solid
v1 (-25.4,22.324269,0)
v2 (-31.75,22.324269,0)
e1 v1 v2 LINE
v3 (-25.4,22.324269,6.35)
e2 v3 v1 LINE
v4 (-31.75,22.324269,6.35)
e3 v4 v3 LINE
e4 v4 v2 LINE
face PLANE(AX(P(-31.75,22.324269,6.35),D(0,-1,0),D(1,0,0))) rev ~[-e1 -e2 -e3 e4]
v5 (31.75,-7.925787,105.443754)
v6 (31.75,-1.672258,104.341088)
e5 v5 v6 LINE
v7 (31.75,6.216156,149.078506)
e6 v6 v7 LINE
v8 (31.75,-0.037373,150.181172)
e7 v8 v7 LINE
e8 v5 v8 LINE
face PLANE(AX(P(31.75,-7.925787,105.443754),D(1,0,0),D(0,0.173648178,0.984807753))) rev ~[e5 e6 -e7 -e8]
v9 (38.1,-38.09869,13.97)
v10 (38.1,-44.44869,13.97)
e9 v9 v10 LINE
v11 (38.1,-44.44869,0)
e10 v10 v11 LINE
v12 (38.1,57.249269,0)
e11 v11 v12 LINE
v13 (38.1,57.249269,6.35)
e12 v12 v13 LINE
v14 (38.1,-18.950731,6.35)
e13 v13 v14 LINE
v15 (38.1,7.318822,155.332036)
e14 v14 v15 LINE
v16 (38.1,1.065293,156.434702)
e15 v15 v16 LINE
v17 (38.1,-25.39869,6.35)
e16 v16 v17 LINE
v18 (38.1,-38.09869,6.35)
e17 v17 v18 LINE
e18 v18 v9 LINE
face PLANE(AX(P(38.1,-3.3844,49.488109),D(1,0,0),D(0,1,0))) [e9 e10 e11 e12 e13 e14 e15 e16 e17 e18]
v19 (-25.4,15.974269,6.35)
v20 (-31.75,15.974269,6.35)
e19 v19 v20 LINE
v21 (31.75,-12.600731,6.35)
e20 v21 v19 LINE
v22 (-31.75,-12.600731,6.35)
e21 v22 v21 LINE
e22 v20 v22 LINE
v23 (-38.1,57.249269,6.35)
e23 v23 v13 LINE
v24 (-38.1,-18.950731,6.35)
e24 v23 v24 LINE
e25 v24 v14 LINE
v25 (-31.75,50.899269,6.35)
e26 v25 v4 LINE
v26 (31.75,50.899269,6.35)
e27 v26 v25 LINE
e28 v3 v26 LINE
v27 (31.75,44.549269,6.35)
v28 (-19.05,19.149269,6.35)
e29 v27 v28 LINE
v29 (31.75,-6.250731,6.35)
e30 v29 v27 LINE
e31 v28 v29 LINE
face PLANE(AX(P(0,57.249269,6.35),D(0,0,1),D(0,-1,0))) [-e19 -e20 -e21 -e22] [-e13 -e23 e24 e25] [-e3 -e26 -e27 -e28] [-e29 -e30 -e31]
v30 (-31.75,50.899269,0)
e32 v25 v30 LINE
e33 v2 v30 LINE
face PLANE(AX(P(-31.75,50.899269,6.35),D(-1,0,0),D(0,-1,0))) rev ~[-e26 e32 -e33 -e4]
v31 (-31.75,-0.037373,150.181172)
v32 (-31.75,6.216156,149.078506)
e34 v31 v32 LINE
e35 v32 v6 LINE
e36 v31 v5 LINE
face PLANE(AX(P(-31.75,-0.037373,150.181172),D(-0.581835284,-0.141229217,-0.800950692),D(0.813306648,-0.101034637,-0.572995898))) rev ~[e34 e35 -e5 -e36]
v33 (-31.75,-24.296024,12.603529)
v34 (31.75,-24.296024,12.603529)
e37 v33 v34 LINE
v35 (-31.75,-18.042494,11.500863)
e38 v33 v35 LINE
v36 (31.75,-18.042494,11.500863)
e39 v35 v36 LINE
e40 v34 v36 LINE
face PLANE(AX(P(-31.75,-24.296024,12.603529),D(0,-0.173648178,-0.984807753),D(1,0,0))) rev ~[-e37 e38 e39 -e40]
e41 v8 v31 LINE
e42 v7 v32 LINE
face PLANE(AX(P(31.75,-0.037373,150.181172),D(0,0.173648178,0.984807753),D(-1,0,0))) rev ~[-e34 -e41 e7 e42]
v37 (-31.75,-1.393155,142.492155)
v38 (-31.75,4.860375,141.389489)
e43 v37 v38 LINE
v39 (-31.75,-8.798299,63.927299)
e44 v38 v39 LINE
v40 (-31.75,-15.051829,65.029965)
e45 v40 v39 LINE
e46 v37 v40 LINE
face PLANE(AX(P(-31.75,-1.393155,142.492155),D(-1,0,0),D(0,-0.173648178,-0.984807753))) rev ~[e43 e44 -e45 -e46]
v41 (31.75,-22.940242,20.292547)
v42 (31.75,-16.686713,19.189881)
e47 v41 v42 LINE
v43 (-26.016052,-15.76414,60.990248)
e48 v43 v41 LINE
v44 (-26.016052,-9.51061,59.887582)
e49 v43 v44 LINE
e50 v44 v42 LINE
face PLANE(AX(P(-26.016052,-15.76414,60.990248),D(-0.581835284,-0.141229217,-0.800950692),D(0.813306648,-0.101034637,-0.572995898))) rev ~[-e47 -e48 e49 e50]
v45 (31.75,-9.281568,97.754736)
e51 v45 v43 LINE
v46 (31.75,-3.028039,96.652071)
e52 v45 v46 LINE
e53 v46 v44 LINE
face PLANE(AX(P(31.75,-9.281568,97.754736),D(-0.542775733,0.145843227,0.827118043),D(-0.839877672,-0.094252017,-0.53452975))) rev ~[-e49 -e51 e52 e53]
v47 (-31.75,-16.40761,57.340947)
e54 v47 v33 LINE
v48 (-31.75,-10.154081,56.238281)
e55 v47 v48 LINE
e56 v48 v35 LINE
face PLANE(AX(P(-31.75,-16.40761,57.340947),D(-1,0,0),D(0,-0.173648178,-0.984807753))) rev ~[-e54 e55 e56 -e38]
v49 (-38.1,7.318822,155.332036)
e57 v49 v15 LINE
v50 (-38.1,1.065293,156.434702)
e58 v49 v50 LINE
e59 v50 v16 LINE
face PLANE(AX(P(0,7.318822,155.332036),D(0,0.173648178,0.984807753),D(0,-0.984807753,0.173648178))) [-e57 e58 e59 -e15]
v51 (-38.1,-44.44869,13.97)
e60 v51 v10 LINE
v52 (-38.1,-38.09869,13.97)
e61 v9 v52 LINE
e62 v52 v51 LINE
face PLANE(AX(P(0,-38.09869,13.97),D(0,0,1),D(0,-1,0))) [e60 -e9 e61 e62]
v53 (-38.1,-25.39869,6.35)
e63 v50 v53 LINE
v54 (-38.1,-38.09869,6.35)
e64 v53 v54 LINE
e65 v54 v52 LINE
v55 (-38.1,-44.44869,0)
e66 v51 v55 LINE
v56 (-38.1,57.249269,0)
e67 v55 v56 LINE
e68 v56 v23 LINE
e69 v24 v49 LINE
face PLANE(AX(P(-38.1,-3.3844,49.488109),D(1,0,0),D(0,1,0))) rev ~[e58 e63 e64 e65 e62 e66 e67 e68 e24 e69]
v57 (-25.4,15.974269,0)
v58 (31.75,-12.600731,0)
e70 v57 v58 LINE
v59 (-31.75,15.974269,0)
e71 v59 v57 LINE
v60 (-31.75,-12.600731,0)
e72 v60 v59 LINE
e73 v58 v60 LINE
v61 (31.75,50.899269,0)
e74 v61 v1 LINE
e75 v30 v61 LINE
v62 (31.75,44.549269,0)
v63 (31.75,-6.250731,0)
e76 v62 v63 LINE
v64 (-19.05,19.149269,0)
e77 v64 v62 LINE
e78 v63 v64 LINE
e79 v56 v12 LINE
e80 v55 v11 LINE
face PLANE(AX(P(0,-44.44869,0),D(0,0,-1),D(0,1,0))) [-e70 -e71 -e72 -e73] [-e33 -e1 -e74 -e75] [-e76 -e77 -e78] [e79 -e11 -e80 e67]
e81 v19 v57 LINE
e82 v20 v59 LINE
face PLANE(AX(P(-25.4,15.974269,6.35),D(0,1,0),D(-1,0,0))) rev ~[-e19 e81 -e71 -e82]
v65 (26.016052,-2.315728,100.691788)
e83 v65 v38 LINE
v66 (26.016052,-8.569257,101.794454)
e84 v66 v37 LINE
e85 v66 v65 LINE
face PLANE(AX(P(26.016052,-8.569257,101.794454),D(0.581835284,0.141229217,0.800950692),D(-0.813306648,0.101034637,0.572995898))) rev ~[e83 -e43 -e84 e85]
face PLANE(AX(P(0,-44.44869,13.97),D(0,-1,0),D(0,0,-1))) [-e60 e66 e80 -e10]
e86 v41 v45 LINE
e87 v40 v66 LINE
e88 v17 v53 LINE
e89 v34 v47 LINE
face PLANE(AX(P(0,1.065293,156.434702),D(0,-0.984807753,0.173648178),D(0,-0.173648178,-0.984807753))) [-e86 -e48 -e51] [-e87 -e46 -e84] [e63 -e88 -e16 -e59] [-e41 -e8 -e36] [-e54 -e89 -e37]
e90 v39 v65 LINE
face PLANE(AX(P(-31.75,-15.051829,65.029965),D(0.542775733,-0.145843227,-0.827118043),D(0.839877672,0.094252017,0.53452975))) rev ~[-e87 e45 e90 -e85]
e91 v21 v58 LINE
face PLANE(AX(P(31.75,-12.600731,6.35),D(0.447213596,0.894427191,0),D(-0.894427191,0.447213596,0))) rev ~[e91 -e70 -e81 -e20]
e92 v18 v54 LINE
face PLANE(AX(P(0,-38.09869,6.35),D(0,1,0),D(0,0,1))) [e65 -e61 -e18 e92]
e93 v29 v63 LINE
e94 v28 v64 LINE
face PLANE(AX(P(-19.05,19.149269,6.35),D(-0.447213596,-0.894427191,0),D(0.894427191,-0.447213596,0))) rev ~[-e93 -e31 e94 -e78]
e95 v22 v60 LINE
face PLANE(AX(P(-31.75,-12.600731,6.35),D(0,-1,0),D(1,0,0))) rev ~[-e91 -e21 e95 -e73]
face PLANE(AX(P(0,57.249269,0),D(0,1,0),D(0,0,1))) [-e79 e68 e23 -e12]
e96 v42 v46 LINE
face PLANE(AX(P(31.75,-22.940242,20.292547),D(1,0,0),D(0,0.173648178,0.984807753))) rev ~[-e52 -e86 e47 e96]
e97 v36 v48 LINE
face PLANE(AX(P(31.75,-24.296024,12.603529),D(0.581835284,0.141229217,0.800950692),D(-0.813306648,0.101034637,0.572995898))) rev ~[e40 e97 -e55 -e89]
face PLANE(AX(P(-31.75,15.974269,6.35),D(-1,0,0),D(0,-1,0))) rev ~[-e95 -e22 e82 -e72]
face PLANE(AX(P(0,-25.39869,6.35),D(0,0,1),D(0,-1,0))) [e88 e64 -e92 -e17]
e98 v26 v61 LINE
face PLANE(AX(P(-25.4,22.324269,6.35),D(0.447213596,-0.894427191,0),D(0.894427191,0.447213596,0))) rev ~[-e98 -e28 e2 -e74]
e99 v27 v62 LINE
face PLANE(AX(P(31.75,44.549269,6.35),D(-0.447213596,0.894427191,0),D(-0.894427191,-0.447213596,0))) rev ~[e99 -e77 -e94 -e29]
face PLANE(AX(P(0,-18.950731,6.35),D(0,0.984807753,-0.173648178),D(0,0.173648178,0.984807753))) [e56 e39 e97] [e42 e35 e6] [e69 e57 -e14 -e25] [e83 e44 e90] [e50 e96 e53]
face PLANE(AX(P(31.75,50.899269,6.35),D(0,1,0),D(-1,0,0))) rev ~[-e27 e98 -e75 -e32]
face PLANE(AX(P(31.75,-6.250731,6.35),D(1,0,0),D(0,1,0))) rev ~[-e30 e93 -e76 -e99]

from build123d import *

# Parameters (mm, degrees)
F1_DEPTH = 38.1
F3_DEPTH = 25.4
F5_DEPTH = 6.35


with BuildPart() as f1:
    # F0 (on Right) → F1 (new body, symmetric)
    with BuildSketch(Plane.YZ):
        Polygon((-38.0986895752, 13.97), (-44.4486895752, 13.97), (-44.4486895752, 0), (57.2492694102, 0), (57.2492694102, 6.35), (-18.9507305898, 6.35), (7.3188219328, 155.3320356309), (1.0652927012, 156.4347015591), (-25.3986895752, 6.35), (-38.0986895752, 6.35), align=None)
    extrude(amount=F1_DEPTH, both=True)

    # F2 (on face) → F3 (cut)
    with BuildSketch(Plane.XY.offset(6.35)):
        Polygon((-31.75, -12.6007305898), (31.75, -12.6007305898), (-25.4, 15.9742694102), (-31.75, 15.9742694102), align=None)
        Polygon((31.75, -6.2507305898), (31.75, 44.5492694102), (-19.05, 19.1492694102), align=None)
        Polygon((-25.4, 22.3242694102), (31.75, 50.8992694102), (-31.75, 50.8992694102), (-31.75, 22.3242694102), align=None)
    extrude(amount=-F3_DEPTH, mode=Mode.SUBTRACT)

    # F4 (on face) → F5 (cut, through all)
    with BuildSketch(Plane(origin=(0, -25.7187393284, 4.5349076534), x_dir=(1, 0, 0), z_dir=(0, -0.984807753, 0.1736481777))):
        Polygon((31.75, 147.8930930718), (-31.75, 147.8930930718), (31.75, 102.4655281848), align=None)
        Polygon((26.0160516338, 98.7599313647), (-31.75, 140.0854598506), (-31.75, 61.4282911798), align=None)
        Polygon((31.75, 16.0007262929), (31.75, 94.6578949637), (-26.0160516338, 57.3262547788), align=None)
        Polygon((31.75, 8.1930930718), (-31.75, 53.6206579587), (-31.75, 8.1930930718), align=None)
    extrude(amount=-F5_DEPTH, mode=Mode.SUBTRACT)


solid = f1.part
